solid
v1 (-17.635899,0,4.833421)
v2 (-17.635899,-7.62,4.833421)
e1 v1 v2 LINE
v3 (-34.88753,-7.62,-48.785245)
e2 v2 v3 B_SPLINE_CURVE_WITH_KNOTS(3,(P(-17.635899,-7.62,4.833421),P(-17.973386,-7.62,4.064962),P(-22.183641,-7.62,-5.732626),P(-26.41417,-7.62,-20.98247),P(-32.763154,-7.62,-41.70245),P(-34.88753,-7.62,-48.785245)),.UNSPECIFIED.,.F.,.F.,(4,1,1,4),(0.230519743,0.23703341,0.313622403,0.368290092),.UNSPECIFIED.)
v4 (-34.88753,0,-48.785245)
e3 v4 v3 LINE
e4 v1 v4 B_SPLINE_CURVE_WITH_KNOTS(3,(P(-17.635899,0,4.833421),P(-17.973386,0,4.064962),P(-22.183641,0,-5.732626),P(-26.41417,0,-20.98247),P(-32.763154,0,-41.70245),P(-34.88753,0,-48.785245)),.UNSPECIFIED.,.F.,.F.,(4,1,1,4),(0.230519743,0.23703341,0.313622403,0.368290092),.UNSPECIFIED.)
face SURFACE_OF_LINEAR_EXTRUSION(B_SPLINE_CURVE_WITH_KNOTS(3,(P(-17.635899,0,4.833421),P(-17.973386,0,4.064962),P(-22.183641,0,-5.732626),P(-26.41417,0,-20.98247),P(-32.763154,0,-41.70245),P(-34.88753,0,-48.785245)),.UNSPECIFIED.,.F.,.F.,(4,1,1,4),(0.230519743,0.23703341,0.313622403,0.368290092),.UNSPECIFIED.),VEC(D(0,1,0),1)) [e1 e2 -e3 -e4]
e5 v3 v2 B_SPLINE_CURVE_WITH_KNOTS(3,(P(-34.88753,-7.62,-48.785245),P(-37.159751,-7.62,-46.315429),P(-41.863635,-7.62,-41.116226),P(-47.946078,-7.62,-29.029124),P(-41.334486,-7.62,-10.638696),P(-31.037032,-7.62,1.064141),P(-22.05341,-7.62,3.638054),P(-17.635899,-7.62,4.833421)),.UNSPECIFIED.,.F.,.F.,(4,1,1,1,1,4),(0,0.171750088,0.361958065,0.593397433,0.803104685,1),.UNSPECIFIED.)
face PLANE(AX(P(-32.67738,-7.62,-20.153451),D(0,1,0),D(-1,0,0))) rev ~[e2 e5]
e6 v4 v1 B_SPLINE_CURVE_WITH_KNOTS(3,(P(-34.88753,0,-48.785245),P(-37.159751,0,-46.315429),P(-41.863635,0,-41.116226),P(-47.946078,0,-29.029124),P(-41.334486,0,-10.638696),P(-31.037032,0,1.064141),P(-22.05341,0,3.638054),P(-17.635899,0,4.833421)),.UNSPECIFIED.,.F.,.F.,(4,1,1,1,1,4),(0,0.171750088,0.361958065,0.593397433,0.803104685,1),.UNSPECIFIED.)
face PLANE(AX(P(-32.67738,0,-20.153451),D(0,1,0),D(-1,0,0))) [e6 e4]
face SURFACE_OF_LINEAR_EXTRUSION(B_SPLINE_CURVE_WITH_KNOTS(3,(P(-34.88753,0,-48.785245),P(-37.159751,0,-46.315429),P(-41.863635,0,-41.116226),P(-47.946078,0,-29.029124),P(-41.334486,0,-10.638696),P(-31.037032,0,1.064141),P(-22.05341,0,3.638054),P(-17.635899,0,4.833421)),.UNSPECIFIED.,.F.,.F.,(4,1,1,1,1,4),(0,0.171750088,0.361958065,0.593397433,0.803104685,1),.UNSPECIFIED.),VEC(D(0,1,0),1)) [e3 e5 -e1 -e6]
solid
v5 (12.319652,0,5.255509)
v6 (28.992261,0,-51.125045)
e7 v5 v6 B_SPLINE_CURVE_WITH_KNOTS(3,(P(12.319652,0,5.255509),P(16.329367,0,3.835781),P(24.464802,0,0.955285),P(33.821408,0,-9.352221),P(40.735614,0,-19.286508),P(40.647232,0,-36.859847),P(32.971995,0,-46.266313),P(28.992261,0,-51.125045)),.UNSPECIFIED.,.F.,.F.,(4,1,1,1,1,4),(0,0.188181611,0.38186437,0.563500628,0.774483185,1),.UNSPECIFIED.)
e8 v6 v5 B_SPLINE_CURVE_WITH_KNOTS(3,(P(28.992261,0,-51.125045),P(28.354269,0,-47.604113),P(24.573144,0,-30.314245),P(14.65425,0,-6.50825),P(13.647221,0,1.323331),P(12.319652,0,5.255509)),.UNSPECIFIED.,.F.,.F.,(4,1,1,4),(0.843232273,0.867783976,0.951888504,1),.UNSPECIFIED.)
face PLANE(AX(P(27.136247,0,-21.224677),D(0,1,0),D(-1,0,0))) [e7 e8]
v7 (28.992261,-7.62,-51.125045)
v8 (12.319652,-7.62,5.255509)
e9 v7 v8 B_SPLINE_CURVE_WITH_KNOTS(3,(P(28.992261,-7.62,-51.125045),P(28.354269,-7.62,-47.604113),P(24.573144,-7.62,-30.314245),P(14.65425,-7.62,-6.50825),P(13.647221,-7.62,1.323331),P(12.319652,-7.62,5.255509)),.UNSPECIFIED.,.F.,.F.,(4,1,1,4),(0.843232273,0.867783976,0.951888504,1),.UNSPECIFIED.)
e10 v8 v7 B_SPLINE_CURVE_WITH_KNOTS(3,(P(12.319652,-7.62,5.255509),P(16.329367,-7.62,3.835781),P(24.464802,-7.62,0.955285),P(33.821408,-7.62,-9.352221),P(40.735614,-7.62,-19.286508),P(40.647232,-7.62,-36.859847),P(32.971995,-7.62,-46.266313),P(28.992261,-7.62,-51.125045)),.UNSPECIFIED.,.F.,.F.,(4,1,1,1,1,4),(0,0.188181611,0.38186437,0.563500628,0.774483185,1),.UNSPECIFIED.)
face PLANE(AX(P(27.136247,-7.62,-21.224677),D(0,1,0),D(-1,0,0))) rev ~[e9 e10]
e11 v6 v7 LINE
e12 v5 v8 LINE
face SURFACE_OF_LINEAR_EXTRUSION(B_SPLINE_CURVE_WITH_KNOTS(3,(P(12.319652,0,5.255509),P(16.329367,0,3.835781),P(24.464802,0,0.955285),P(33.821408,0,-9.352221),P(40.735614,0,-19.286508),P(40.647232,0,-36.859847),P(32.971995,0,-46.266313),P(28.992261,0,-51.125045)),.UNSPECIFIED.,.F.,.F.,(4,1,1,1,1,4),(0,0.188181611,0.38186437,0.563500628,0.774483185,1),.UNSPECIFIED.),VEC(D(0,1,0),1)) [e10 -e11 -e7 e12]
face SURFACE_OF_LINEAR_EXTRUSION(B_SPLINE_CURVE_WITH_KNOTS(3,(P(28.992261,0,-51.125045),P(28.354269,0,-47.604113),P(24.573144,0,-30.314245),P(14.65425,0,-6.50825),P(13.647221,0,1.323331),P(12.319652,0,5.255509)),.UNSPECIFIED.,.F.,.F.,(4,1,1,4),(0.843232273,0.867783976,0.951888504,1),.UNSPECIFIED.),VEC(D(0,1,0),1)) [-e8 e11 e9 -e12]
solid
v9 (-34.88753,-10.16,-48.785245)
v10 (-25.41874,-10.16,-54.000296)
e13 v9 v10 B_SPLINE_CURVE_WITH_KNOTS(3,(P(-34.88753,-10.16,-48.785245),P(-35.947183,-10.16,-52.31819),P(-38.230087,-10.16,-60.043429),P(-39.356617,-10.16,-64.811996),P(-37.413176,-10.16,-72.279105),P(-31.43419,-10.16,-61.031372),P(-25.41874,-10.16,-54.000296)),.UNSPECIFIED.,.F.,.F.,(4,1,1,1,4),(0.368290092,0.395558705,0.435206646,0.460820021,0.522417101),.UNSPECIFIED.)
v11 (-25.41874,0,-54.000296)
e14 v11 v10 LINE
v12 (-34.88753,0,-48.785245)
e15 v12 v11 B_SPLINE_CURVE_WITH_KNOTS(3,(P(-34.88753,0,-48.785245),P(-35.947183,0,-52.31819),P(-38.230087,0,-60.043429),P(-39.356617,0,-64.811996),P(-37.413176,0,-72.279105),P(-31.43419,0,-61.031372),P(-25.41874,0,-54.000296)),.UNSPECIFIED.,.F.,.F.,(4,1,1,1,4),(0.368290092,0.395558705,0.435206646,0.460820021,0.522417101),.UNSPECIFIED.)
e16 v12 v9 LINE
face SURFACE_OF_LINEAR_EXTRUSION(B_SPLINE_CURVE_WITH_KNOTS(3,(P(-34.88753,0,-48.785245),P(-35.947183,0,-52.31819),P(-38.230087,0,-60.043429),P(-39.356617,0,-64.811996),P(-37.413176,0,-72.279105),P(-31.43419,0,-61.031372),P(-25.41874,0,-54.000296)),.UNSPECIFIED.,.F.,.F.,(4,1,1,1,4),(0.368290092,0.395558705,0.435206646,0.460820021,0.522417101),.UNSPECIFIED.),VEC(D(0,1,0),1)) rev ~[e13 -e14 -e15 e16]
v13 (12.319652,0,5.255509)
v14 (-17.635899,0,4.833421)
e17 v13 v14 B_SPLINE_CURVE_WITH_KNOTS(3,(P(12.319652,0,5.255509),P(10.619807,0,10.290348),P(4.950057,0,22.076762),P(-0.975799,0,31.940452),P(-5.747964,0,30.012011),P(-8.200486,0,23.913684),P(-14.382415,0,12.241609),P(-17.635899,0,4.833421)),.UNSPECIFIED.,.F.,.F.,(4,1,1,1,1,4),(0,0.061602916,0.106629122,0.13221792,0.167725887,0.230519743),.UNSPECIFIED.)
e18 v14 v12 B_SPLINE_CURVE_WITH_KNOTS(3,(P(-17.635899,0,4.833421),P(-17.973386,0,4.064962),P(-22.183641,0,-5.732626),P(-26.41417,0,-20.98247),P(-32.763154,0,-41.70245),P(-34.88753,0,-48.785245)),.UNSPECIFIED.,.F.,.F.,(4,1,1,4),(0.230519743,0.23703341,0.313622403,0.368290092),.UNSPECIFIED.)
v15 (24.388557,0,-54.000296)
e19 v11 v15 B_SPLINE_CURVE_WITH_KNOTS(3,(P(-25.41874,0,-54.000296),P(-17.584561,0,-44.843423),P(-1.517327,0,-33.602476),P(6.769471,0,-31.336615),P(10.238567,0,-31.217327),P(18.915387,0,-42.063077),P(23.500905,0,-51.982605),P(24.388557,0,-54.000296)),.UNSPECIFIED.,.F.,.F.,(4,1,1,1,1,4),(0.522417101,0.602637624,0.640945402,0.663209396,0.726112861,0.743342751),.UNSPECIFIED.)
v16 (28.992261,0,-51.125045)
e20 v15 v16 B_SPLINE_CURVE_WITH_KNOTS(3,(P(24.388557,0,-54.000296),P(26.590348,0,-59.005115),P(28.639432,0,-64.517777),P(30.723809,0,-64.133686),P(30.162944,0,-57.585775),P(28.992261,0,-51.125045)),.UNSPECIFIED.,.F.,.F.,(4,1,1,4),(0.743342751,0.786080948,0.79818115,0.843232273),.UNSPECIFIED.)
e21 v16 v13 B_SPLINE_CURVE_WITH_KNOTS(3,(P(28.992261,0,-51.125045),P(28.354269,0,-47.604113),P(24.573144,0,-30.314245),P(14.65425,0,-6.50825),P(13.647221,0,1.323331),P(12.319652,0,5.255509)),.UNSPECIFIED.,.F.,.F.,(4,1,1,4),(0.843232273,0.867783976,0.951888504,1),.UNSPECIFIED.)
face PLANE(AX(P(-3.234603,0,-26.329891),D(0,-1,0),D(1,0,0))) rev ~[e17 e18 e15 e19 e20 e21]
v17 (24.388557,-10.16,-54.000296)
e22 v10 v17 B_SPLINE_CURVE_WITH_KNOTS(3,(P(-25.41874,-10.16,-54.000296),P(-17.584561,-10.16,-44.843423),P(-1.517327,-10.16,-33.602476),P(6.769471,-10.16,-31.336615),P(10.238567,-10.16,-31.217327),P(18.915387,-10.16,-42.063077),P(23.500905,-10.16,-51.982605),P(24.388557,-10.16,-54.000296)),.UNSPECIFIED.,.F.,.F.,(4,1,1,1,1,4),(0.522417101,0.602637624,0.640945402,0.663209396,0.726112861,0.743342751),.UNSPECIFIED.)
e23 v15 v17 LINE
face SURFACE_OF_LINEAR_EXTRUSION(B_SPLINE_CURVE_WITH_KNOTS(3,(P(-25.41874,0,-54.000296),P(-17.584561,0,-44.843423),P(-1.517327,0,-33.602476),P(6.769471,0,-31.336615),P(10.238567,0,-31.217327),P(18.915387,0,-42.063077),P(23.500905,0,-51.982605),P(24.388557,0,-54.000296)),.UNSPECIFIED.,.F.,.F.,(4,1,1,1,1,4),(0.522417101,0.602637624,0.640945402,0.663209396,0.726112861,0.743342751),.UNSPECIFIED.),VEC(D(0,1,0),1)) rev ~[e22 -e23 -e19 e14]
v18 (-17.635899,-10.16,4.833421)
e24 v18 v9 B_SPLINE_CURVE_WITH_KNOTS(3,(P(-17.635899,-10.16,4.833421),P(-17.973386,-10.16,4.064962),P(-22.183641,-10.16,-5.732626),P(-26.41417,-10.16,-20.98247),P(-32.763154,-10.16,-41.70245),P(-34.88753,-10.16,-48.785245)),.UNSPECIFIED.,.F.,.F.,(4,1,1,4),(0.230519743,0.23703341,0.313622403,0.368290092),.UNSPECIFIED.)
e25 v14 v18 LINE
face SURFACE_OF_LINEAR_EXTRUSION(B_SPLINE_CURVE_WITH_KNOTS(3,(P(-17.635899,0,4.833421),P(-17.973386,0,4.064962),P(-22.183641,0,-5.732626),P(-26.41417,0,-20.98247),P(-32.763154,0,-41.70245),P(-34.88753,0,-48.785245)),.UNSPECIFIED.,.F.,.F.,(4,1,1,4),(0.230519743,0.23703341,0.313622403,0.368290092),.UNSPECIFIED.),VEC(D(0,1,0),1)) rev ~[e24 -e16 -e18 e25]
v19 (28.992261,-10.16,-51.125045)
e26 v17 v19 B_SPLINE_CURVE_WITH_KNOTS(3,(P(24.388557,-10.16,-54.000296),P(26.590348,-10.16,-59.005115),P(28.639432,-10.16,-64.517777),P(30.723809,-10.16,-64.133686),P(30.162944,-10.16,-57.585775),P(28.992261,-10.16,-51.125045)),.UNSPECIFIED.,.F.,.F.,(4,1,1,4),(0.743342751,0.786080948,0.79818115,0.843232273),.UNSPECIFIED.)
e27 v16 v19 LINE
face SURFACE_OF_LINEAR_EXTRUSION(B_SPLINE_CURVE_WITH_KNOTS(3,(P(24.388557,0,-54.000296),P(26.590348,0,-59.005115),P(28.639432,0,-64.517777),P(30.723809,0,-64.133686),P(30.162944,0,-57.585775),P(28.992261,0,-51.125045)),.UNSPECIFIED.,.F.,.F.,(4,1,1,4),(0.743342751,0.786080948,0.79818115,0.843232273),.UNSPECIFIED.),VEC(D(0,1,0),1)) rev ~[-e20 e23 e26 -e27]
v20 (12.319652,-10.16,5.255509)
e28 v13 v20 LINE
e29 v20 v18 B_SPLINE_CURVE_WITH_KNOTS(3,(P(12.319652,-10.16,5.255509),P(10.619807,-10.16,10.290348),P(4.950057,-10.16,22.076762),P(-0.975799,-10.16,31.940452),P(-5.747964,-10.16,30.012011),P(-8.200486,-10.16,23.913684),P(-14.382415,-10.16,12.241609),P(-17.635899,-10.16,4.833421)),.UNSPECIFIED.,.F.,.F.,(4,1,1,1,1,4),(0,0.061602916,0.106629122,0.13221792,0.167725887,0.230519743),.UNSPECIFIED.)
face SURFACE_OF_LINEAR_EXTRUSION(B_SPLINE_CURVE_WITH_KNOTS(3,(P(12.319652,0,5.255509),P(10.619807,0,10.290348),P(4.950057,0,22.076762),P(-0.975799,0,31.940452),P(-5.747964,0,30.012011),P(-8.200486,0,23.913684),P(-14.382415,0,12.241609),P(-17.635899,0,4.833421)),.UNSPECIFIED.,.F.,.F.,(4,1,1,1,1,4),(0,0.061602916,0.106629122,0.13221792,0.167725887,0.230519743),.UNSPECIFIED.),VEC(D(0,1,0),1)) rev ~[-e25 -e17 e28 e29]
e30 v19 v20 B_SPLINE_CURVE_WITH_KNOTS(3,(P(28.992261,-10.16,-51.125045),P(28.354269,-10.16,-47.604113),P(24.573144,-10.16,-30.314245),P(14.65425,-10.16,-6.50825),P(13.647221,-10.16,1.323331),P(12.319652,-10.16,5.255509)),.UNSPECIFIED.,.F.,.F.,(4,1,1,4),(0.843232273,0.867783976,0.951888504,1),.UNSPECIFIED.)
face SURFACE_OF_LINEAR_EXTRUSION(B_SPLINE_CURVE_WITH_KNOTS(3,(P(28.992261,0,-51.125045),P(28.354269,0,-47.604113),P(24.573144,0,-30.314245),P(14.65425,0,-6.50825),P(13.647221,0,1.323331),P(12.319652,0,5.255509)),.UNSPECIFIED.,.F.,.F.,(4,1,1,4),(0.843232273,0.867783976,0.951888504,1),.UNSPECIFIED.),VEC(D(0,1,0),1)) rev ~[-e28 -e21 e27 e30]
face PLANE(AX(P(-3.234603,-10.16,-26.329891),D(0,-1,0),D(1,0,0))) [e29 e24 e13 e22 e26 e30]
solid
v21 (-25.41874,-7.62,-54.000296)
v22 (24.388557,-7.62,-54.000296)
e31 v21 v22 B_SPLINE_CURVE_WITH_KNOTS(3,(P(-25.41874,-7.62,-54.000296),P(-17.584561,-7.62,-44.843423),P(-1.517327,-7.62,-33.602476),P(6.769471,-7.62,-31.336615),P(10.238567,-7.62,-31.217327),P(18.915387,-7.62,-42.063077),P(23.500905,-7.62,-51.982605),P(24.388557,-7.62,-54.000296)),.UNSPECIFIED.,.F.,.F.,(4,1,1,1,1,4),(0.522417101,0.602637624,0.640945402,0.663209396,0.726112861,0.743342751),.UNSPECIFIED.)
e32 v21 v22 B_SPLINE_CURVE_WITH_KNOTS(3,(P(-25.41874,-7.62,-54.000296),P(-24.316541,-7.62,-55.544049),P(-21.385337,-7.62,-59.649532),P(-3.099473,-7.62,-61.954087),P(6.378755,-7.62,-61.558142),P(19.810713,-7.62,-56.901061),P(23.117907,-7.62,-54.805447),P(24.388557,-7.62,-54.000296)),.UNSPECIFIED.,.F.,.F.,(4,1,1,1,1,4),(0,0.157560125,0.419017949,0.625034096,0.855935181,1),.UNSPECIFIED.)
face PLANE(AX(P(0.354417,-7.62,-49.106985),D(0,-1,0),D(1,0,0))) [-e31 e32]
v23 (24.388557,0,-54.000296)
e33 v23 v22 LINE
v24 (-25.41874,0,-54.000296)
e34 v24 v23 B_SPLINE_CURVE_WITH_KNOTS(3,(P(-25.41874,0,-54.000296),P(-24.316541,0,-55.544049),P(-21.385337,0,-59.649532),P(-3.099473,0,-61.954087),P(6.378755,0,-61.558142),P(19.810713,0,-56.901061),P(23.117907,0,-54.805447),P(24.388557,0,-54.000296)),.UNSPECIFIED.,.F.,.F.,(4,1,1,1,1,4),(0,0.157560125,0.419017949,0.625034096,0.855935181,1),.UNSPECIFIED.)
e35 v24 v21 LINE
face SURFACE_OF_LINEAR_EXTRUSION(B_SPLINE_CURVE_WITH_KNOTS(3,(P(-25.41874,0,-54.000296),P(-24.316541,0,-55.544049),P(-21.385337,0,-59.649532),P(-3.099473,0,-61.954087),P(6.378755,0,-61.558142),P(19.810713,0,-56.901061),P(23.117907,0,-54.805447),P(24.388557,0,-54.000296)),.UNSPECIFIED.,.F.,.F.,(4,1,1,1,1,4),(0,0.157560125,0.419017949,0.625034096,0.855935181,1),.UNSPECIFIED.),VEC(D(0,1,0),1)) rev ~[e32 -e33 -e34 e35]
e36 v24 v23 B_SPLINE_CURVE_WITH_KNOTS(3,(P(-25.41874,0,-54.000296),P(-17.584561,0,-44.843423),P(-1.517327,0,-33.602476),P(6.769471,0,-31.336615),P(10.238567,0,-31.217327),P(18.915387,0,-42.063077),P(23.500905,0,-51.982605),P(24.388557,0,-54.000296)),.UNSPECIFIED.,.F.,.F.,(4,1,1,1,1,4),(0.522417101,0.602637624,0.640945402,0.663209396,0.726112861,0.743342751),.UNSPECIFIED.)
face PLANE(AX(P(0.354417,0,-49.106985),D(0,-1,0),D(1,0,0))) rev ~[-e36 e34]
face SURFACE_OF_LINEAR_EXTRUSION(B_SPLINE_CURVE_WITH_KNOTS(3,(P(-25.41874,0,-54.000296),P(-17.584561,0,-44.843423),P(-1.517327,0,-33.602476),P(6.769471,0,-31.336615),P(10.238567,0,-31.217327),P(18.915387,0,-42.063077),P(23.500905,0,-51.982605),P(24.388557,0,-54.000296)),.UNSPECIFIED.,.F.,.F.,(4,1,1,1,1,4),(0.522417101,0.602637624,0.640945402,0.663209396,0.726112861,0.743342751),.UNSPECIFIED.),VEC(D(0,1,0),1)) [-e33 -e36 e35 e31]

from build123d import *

# Parameters (mm, degrees)
F1_DEPTH = 10.16
F2_DEPTH = 7.62


# Not quite as in the source:
# - a feature names something its author has since deleted; it is built from what else it names


with BuildPart() as f1:
    # F0 (on Front) → F1 (new body)
    with BuildSketch(Plane.XZ):
        with BuildLine():
            add(Edge.make_bspline(
                [(28.992260687, -51.125045095), (28.3542685584, -47.6041133313), (24.5731440192, -30.3142446822), (14.6542496305, -6.5082500378), (13.6472214399, 1.3233310586), (12.3196523637, 5.2555091679)],
                knots=[0.8432322735, 0.8432322735, 0.8432322735, 0.8432322735, 0.8677839764, 0.9518885045, 1, 1, 1, 1], degree=3))
            add(Edge.make_bspline(
                [(12.3196523637, 5.2555091679), (10.61980651, 10.290348239), (4.9500571604, 22.0767618937), (-0.9757985337, 31.9404522882), (-5.7479640246, 30.0120107701), (-8.2004857079, 23.9136843789), (-14.3824154124, 12.2416093831), (-17.6358987441, 4.8334208231)],
                knots=[0, 0, 0, 0, 0.0616029159, 0.1066291224, 0.1322179197, 0.1677258873, 0.2305197427, 0.2305197427, 0.2305197427, 0.2305197427], degree=3))
            add(Edge.make_bspline(
                [(-17.6358987441, 4.8334208231), (-17.9733857287, 4.0649622317), (-22.1836405162, -5.7326263077), (-26.4141695975, -20.9824695343), (-32.763153948, -41.7024504699), (-34.8875297492, -48.7852445916)],
                knots=[0.2305197427, 0.2305197427, 0.2305197427, 0.2305197427, 0.2370334103, 0.3136224027, 0.3682900919, 0.3682900919, 0.3682900919, 0.3682900919], degree=3))
            add(Edge.make_bspline(
                [(-34.8875297492, -48.7852445916), (-35.9471827463, -52.3181901349), (-38.2300866389, -60.0434285284), (-39.3566173352, -64.8119959688), (-37.4131760235, -72.2791048189), (-31.4341899312, -61.0313718112), (-25.4187397659, -54.0002956986)],
                knots=[0.3682900919, 0.3682900919, 0.3682900919, 0.3682900919, 0.3955587045, 0.4352066461, 0.460820021, 0.5224171012, 0.5224171012, 0.5224171012, 0.5224171012], degree=3))
            add(Edge.make_bspline(
                [(-25.4187397659, -54.0002956986), (-17.5845607261, -44.8434233791), (-1.5173266758, -33.6024762984), (6.7694707164, -31.3366153102), (10.2385672181, -31.2173267791), (18.9153870863, -42.0630767436), (23.5009052342, -51.982604528), (24.3885566757, -54.0002956986)],
                knots=[0.5224171012, 0.5224171012, 0.5224171012, 0.5224171012, 0.6026376236, 0.6409454024, 0.6632093958, 0.7261128605, 0.7433427512, 0.7433427512, 0.7433427512, 0.7433427512], degree=3))
            add(Edge.make_bspline(
                [(24.3885566757, -54.0002956986), (26.5903478901, -59.0051145786), (28.6394317601, -64.5177765642), (30.7238087214, -64.1336863489), (30.1629437266, -57.5857754307), (28.992260687, -51.125045095)],
                knots=[0.7433427512, 0.7433427512, 0.7433427512, 0.7433427512, 0.7860809481, 0.7981811499, 0.8432322735, 0.8432322735, 0.8432322735, 0.8432322735], degree=3))
        make_face()
    extrude(amount=F1_DEPTH)


with BuildPart() as f2:
    # F0 (on Front) → F2 (new body)
    with BuildSketch(Plane.XZ):
        with BuildLine():
            add(Edge.make_bspline(
                [(12.3196523637, 5.2555091679), (16.3293673506, 3.8357811983), (24.4648018895, 0.9552851882), (33.8214083274, -9.3522210684), (40.7356141666, -19.286508233), (40.6472321133, -36.8598470106), (32.9719946095, -46.2663130218), (28.992260687, -51.125045095)],
                knots=[0, 0, 0, 0, 0.1881816106, 0.3818643701, 0.5635006279, 0.7744831849, 1, 1, 1, 1], degree=3))
            add(Edge.make_bspline(
                [(28.992260687, -51.125045095), (28.3542685584, -47.6041133313), (24.5731440192, -30.3142446822), (14.6542496305, -6.5082500378), (13.6472214399, 1.3233310586), (12.3196523637, 5.2555091679)],
                knots=[0.8432322735, 0.8432322735, 0.8432322735, 0.8432322735, 0.8677839764, 0.9518885045, 1, 1, 1, 1], degree=3))
        make_face()
    extrude(amount=F2_DEPTH)


with BuildPart() as f2b:
    # F0 (on Front) → F2, piece 2 (new body)
    with BuildSketch(Plane.XZ):
        with BuildLine():
            add(Edge.make_bspline(
                [(-25.4187397659, -54.0002956986), (-24.3165414563, -55.5440490563), (-21.3853374114, -59.6495317512), (-3.0994731674, -61.9540870824), (6.3787545796, -61.5581423049), (19.8107127549, -56.901060642), (23.1179069318, -54.8054468343), (24.3885566757, -54.0002956986)],
                knots=[0, 0, 0, 0, 0.1575601247, 0.4190179487, 0.6250340965, 0.8559351814, 1, 1, 1, 1], degree=3))
            add(Edge.make_bspline(
                [(-25.4187397659, -54.0002956986), (-17.5845607261, -44.8434233791), (-1.5173266758, -33.6024762984), (6.7694707164, -31.3366153102), (10.2385672181, -31.2173267791), (18.9153870863, -42.0630767436), (23.5009052342, -51.982604528), (24.3885566757, -54.0002956986)],
                knots=[0.5224171012, 0.5224171012, 0.5224171012, 0.5224171012, 0.6026376236, 0.6409454024, 0.6632093958, 0.7261128605, 0.7433427512, 0.7433427512, 0.7433427512, 0.7433427512], degree=3))
        make_face()
    extrude(amount=F2_DEPTH)


with BuildPart() as f2c:
    # F0 (on Front) → F2, piece 3 (new body)
    with BuildSketch(Plane.XZ):
        with BuildLine():
            add(Edge.make_bspline(
                [(-17.6358987441, 4.8334208231), (-17.9733857287, 4.0649622317), (-22.1836405162, -5.7326263077), (-26.4141695975, -20.9824695343), (-32.763153948, -41.7024504699), (-34.8875297492, -48.7852445916)],
                knots=[0.2305197427, 0.2305197427, 0.2305197427, 0.2305197427, 0.2370334103, 0.3136224027, 0.3682900919, 0.3682900919, 0.3682900919, 0.3682900919], degree=3))
            add(Edge.make_bspline(
                [(-34.8875297492, -48.7852445916), (-37.1597512143, -46.3154286709), (-41.8636352624, -41.1162261119), (-47.9460775261, -29.0291237763), (-41.3344862222, -10.6386963733), (-31.0370320647, 1.0641410772), (-22.053409524, 3.6380541687), (-17.6358987441, 4.8334208231)],
                knots=[0, 0, 0, 0, 0.1717500879, 0.3619580647, 0.5933974335, 0.8031046848, 1, 1, 1, 1], degree=3))
        make_face()
    extrude(amount=F2_DEPTH)


solid = Compound([f1.part, f2.part, f2b.part, f2c.part])
